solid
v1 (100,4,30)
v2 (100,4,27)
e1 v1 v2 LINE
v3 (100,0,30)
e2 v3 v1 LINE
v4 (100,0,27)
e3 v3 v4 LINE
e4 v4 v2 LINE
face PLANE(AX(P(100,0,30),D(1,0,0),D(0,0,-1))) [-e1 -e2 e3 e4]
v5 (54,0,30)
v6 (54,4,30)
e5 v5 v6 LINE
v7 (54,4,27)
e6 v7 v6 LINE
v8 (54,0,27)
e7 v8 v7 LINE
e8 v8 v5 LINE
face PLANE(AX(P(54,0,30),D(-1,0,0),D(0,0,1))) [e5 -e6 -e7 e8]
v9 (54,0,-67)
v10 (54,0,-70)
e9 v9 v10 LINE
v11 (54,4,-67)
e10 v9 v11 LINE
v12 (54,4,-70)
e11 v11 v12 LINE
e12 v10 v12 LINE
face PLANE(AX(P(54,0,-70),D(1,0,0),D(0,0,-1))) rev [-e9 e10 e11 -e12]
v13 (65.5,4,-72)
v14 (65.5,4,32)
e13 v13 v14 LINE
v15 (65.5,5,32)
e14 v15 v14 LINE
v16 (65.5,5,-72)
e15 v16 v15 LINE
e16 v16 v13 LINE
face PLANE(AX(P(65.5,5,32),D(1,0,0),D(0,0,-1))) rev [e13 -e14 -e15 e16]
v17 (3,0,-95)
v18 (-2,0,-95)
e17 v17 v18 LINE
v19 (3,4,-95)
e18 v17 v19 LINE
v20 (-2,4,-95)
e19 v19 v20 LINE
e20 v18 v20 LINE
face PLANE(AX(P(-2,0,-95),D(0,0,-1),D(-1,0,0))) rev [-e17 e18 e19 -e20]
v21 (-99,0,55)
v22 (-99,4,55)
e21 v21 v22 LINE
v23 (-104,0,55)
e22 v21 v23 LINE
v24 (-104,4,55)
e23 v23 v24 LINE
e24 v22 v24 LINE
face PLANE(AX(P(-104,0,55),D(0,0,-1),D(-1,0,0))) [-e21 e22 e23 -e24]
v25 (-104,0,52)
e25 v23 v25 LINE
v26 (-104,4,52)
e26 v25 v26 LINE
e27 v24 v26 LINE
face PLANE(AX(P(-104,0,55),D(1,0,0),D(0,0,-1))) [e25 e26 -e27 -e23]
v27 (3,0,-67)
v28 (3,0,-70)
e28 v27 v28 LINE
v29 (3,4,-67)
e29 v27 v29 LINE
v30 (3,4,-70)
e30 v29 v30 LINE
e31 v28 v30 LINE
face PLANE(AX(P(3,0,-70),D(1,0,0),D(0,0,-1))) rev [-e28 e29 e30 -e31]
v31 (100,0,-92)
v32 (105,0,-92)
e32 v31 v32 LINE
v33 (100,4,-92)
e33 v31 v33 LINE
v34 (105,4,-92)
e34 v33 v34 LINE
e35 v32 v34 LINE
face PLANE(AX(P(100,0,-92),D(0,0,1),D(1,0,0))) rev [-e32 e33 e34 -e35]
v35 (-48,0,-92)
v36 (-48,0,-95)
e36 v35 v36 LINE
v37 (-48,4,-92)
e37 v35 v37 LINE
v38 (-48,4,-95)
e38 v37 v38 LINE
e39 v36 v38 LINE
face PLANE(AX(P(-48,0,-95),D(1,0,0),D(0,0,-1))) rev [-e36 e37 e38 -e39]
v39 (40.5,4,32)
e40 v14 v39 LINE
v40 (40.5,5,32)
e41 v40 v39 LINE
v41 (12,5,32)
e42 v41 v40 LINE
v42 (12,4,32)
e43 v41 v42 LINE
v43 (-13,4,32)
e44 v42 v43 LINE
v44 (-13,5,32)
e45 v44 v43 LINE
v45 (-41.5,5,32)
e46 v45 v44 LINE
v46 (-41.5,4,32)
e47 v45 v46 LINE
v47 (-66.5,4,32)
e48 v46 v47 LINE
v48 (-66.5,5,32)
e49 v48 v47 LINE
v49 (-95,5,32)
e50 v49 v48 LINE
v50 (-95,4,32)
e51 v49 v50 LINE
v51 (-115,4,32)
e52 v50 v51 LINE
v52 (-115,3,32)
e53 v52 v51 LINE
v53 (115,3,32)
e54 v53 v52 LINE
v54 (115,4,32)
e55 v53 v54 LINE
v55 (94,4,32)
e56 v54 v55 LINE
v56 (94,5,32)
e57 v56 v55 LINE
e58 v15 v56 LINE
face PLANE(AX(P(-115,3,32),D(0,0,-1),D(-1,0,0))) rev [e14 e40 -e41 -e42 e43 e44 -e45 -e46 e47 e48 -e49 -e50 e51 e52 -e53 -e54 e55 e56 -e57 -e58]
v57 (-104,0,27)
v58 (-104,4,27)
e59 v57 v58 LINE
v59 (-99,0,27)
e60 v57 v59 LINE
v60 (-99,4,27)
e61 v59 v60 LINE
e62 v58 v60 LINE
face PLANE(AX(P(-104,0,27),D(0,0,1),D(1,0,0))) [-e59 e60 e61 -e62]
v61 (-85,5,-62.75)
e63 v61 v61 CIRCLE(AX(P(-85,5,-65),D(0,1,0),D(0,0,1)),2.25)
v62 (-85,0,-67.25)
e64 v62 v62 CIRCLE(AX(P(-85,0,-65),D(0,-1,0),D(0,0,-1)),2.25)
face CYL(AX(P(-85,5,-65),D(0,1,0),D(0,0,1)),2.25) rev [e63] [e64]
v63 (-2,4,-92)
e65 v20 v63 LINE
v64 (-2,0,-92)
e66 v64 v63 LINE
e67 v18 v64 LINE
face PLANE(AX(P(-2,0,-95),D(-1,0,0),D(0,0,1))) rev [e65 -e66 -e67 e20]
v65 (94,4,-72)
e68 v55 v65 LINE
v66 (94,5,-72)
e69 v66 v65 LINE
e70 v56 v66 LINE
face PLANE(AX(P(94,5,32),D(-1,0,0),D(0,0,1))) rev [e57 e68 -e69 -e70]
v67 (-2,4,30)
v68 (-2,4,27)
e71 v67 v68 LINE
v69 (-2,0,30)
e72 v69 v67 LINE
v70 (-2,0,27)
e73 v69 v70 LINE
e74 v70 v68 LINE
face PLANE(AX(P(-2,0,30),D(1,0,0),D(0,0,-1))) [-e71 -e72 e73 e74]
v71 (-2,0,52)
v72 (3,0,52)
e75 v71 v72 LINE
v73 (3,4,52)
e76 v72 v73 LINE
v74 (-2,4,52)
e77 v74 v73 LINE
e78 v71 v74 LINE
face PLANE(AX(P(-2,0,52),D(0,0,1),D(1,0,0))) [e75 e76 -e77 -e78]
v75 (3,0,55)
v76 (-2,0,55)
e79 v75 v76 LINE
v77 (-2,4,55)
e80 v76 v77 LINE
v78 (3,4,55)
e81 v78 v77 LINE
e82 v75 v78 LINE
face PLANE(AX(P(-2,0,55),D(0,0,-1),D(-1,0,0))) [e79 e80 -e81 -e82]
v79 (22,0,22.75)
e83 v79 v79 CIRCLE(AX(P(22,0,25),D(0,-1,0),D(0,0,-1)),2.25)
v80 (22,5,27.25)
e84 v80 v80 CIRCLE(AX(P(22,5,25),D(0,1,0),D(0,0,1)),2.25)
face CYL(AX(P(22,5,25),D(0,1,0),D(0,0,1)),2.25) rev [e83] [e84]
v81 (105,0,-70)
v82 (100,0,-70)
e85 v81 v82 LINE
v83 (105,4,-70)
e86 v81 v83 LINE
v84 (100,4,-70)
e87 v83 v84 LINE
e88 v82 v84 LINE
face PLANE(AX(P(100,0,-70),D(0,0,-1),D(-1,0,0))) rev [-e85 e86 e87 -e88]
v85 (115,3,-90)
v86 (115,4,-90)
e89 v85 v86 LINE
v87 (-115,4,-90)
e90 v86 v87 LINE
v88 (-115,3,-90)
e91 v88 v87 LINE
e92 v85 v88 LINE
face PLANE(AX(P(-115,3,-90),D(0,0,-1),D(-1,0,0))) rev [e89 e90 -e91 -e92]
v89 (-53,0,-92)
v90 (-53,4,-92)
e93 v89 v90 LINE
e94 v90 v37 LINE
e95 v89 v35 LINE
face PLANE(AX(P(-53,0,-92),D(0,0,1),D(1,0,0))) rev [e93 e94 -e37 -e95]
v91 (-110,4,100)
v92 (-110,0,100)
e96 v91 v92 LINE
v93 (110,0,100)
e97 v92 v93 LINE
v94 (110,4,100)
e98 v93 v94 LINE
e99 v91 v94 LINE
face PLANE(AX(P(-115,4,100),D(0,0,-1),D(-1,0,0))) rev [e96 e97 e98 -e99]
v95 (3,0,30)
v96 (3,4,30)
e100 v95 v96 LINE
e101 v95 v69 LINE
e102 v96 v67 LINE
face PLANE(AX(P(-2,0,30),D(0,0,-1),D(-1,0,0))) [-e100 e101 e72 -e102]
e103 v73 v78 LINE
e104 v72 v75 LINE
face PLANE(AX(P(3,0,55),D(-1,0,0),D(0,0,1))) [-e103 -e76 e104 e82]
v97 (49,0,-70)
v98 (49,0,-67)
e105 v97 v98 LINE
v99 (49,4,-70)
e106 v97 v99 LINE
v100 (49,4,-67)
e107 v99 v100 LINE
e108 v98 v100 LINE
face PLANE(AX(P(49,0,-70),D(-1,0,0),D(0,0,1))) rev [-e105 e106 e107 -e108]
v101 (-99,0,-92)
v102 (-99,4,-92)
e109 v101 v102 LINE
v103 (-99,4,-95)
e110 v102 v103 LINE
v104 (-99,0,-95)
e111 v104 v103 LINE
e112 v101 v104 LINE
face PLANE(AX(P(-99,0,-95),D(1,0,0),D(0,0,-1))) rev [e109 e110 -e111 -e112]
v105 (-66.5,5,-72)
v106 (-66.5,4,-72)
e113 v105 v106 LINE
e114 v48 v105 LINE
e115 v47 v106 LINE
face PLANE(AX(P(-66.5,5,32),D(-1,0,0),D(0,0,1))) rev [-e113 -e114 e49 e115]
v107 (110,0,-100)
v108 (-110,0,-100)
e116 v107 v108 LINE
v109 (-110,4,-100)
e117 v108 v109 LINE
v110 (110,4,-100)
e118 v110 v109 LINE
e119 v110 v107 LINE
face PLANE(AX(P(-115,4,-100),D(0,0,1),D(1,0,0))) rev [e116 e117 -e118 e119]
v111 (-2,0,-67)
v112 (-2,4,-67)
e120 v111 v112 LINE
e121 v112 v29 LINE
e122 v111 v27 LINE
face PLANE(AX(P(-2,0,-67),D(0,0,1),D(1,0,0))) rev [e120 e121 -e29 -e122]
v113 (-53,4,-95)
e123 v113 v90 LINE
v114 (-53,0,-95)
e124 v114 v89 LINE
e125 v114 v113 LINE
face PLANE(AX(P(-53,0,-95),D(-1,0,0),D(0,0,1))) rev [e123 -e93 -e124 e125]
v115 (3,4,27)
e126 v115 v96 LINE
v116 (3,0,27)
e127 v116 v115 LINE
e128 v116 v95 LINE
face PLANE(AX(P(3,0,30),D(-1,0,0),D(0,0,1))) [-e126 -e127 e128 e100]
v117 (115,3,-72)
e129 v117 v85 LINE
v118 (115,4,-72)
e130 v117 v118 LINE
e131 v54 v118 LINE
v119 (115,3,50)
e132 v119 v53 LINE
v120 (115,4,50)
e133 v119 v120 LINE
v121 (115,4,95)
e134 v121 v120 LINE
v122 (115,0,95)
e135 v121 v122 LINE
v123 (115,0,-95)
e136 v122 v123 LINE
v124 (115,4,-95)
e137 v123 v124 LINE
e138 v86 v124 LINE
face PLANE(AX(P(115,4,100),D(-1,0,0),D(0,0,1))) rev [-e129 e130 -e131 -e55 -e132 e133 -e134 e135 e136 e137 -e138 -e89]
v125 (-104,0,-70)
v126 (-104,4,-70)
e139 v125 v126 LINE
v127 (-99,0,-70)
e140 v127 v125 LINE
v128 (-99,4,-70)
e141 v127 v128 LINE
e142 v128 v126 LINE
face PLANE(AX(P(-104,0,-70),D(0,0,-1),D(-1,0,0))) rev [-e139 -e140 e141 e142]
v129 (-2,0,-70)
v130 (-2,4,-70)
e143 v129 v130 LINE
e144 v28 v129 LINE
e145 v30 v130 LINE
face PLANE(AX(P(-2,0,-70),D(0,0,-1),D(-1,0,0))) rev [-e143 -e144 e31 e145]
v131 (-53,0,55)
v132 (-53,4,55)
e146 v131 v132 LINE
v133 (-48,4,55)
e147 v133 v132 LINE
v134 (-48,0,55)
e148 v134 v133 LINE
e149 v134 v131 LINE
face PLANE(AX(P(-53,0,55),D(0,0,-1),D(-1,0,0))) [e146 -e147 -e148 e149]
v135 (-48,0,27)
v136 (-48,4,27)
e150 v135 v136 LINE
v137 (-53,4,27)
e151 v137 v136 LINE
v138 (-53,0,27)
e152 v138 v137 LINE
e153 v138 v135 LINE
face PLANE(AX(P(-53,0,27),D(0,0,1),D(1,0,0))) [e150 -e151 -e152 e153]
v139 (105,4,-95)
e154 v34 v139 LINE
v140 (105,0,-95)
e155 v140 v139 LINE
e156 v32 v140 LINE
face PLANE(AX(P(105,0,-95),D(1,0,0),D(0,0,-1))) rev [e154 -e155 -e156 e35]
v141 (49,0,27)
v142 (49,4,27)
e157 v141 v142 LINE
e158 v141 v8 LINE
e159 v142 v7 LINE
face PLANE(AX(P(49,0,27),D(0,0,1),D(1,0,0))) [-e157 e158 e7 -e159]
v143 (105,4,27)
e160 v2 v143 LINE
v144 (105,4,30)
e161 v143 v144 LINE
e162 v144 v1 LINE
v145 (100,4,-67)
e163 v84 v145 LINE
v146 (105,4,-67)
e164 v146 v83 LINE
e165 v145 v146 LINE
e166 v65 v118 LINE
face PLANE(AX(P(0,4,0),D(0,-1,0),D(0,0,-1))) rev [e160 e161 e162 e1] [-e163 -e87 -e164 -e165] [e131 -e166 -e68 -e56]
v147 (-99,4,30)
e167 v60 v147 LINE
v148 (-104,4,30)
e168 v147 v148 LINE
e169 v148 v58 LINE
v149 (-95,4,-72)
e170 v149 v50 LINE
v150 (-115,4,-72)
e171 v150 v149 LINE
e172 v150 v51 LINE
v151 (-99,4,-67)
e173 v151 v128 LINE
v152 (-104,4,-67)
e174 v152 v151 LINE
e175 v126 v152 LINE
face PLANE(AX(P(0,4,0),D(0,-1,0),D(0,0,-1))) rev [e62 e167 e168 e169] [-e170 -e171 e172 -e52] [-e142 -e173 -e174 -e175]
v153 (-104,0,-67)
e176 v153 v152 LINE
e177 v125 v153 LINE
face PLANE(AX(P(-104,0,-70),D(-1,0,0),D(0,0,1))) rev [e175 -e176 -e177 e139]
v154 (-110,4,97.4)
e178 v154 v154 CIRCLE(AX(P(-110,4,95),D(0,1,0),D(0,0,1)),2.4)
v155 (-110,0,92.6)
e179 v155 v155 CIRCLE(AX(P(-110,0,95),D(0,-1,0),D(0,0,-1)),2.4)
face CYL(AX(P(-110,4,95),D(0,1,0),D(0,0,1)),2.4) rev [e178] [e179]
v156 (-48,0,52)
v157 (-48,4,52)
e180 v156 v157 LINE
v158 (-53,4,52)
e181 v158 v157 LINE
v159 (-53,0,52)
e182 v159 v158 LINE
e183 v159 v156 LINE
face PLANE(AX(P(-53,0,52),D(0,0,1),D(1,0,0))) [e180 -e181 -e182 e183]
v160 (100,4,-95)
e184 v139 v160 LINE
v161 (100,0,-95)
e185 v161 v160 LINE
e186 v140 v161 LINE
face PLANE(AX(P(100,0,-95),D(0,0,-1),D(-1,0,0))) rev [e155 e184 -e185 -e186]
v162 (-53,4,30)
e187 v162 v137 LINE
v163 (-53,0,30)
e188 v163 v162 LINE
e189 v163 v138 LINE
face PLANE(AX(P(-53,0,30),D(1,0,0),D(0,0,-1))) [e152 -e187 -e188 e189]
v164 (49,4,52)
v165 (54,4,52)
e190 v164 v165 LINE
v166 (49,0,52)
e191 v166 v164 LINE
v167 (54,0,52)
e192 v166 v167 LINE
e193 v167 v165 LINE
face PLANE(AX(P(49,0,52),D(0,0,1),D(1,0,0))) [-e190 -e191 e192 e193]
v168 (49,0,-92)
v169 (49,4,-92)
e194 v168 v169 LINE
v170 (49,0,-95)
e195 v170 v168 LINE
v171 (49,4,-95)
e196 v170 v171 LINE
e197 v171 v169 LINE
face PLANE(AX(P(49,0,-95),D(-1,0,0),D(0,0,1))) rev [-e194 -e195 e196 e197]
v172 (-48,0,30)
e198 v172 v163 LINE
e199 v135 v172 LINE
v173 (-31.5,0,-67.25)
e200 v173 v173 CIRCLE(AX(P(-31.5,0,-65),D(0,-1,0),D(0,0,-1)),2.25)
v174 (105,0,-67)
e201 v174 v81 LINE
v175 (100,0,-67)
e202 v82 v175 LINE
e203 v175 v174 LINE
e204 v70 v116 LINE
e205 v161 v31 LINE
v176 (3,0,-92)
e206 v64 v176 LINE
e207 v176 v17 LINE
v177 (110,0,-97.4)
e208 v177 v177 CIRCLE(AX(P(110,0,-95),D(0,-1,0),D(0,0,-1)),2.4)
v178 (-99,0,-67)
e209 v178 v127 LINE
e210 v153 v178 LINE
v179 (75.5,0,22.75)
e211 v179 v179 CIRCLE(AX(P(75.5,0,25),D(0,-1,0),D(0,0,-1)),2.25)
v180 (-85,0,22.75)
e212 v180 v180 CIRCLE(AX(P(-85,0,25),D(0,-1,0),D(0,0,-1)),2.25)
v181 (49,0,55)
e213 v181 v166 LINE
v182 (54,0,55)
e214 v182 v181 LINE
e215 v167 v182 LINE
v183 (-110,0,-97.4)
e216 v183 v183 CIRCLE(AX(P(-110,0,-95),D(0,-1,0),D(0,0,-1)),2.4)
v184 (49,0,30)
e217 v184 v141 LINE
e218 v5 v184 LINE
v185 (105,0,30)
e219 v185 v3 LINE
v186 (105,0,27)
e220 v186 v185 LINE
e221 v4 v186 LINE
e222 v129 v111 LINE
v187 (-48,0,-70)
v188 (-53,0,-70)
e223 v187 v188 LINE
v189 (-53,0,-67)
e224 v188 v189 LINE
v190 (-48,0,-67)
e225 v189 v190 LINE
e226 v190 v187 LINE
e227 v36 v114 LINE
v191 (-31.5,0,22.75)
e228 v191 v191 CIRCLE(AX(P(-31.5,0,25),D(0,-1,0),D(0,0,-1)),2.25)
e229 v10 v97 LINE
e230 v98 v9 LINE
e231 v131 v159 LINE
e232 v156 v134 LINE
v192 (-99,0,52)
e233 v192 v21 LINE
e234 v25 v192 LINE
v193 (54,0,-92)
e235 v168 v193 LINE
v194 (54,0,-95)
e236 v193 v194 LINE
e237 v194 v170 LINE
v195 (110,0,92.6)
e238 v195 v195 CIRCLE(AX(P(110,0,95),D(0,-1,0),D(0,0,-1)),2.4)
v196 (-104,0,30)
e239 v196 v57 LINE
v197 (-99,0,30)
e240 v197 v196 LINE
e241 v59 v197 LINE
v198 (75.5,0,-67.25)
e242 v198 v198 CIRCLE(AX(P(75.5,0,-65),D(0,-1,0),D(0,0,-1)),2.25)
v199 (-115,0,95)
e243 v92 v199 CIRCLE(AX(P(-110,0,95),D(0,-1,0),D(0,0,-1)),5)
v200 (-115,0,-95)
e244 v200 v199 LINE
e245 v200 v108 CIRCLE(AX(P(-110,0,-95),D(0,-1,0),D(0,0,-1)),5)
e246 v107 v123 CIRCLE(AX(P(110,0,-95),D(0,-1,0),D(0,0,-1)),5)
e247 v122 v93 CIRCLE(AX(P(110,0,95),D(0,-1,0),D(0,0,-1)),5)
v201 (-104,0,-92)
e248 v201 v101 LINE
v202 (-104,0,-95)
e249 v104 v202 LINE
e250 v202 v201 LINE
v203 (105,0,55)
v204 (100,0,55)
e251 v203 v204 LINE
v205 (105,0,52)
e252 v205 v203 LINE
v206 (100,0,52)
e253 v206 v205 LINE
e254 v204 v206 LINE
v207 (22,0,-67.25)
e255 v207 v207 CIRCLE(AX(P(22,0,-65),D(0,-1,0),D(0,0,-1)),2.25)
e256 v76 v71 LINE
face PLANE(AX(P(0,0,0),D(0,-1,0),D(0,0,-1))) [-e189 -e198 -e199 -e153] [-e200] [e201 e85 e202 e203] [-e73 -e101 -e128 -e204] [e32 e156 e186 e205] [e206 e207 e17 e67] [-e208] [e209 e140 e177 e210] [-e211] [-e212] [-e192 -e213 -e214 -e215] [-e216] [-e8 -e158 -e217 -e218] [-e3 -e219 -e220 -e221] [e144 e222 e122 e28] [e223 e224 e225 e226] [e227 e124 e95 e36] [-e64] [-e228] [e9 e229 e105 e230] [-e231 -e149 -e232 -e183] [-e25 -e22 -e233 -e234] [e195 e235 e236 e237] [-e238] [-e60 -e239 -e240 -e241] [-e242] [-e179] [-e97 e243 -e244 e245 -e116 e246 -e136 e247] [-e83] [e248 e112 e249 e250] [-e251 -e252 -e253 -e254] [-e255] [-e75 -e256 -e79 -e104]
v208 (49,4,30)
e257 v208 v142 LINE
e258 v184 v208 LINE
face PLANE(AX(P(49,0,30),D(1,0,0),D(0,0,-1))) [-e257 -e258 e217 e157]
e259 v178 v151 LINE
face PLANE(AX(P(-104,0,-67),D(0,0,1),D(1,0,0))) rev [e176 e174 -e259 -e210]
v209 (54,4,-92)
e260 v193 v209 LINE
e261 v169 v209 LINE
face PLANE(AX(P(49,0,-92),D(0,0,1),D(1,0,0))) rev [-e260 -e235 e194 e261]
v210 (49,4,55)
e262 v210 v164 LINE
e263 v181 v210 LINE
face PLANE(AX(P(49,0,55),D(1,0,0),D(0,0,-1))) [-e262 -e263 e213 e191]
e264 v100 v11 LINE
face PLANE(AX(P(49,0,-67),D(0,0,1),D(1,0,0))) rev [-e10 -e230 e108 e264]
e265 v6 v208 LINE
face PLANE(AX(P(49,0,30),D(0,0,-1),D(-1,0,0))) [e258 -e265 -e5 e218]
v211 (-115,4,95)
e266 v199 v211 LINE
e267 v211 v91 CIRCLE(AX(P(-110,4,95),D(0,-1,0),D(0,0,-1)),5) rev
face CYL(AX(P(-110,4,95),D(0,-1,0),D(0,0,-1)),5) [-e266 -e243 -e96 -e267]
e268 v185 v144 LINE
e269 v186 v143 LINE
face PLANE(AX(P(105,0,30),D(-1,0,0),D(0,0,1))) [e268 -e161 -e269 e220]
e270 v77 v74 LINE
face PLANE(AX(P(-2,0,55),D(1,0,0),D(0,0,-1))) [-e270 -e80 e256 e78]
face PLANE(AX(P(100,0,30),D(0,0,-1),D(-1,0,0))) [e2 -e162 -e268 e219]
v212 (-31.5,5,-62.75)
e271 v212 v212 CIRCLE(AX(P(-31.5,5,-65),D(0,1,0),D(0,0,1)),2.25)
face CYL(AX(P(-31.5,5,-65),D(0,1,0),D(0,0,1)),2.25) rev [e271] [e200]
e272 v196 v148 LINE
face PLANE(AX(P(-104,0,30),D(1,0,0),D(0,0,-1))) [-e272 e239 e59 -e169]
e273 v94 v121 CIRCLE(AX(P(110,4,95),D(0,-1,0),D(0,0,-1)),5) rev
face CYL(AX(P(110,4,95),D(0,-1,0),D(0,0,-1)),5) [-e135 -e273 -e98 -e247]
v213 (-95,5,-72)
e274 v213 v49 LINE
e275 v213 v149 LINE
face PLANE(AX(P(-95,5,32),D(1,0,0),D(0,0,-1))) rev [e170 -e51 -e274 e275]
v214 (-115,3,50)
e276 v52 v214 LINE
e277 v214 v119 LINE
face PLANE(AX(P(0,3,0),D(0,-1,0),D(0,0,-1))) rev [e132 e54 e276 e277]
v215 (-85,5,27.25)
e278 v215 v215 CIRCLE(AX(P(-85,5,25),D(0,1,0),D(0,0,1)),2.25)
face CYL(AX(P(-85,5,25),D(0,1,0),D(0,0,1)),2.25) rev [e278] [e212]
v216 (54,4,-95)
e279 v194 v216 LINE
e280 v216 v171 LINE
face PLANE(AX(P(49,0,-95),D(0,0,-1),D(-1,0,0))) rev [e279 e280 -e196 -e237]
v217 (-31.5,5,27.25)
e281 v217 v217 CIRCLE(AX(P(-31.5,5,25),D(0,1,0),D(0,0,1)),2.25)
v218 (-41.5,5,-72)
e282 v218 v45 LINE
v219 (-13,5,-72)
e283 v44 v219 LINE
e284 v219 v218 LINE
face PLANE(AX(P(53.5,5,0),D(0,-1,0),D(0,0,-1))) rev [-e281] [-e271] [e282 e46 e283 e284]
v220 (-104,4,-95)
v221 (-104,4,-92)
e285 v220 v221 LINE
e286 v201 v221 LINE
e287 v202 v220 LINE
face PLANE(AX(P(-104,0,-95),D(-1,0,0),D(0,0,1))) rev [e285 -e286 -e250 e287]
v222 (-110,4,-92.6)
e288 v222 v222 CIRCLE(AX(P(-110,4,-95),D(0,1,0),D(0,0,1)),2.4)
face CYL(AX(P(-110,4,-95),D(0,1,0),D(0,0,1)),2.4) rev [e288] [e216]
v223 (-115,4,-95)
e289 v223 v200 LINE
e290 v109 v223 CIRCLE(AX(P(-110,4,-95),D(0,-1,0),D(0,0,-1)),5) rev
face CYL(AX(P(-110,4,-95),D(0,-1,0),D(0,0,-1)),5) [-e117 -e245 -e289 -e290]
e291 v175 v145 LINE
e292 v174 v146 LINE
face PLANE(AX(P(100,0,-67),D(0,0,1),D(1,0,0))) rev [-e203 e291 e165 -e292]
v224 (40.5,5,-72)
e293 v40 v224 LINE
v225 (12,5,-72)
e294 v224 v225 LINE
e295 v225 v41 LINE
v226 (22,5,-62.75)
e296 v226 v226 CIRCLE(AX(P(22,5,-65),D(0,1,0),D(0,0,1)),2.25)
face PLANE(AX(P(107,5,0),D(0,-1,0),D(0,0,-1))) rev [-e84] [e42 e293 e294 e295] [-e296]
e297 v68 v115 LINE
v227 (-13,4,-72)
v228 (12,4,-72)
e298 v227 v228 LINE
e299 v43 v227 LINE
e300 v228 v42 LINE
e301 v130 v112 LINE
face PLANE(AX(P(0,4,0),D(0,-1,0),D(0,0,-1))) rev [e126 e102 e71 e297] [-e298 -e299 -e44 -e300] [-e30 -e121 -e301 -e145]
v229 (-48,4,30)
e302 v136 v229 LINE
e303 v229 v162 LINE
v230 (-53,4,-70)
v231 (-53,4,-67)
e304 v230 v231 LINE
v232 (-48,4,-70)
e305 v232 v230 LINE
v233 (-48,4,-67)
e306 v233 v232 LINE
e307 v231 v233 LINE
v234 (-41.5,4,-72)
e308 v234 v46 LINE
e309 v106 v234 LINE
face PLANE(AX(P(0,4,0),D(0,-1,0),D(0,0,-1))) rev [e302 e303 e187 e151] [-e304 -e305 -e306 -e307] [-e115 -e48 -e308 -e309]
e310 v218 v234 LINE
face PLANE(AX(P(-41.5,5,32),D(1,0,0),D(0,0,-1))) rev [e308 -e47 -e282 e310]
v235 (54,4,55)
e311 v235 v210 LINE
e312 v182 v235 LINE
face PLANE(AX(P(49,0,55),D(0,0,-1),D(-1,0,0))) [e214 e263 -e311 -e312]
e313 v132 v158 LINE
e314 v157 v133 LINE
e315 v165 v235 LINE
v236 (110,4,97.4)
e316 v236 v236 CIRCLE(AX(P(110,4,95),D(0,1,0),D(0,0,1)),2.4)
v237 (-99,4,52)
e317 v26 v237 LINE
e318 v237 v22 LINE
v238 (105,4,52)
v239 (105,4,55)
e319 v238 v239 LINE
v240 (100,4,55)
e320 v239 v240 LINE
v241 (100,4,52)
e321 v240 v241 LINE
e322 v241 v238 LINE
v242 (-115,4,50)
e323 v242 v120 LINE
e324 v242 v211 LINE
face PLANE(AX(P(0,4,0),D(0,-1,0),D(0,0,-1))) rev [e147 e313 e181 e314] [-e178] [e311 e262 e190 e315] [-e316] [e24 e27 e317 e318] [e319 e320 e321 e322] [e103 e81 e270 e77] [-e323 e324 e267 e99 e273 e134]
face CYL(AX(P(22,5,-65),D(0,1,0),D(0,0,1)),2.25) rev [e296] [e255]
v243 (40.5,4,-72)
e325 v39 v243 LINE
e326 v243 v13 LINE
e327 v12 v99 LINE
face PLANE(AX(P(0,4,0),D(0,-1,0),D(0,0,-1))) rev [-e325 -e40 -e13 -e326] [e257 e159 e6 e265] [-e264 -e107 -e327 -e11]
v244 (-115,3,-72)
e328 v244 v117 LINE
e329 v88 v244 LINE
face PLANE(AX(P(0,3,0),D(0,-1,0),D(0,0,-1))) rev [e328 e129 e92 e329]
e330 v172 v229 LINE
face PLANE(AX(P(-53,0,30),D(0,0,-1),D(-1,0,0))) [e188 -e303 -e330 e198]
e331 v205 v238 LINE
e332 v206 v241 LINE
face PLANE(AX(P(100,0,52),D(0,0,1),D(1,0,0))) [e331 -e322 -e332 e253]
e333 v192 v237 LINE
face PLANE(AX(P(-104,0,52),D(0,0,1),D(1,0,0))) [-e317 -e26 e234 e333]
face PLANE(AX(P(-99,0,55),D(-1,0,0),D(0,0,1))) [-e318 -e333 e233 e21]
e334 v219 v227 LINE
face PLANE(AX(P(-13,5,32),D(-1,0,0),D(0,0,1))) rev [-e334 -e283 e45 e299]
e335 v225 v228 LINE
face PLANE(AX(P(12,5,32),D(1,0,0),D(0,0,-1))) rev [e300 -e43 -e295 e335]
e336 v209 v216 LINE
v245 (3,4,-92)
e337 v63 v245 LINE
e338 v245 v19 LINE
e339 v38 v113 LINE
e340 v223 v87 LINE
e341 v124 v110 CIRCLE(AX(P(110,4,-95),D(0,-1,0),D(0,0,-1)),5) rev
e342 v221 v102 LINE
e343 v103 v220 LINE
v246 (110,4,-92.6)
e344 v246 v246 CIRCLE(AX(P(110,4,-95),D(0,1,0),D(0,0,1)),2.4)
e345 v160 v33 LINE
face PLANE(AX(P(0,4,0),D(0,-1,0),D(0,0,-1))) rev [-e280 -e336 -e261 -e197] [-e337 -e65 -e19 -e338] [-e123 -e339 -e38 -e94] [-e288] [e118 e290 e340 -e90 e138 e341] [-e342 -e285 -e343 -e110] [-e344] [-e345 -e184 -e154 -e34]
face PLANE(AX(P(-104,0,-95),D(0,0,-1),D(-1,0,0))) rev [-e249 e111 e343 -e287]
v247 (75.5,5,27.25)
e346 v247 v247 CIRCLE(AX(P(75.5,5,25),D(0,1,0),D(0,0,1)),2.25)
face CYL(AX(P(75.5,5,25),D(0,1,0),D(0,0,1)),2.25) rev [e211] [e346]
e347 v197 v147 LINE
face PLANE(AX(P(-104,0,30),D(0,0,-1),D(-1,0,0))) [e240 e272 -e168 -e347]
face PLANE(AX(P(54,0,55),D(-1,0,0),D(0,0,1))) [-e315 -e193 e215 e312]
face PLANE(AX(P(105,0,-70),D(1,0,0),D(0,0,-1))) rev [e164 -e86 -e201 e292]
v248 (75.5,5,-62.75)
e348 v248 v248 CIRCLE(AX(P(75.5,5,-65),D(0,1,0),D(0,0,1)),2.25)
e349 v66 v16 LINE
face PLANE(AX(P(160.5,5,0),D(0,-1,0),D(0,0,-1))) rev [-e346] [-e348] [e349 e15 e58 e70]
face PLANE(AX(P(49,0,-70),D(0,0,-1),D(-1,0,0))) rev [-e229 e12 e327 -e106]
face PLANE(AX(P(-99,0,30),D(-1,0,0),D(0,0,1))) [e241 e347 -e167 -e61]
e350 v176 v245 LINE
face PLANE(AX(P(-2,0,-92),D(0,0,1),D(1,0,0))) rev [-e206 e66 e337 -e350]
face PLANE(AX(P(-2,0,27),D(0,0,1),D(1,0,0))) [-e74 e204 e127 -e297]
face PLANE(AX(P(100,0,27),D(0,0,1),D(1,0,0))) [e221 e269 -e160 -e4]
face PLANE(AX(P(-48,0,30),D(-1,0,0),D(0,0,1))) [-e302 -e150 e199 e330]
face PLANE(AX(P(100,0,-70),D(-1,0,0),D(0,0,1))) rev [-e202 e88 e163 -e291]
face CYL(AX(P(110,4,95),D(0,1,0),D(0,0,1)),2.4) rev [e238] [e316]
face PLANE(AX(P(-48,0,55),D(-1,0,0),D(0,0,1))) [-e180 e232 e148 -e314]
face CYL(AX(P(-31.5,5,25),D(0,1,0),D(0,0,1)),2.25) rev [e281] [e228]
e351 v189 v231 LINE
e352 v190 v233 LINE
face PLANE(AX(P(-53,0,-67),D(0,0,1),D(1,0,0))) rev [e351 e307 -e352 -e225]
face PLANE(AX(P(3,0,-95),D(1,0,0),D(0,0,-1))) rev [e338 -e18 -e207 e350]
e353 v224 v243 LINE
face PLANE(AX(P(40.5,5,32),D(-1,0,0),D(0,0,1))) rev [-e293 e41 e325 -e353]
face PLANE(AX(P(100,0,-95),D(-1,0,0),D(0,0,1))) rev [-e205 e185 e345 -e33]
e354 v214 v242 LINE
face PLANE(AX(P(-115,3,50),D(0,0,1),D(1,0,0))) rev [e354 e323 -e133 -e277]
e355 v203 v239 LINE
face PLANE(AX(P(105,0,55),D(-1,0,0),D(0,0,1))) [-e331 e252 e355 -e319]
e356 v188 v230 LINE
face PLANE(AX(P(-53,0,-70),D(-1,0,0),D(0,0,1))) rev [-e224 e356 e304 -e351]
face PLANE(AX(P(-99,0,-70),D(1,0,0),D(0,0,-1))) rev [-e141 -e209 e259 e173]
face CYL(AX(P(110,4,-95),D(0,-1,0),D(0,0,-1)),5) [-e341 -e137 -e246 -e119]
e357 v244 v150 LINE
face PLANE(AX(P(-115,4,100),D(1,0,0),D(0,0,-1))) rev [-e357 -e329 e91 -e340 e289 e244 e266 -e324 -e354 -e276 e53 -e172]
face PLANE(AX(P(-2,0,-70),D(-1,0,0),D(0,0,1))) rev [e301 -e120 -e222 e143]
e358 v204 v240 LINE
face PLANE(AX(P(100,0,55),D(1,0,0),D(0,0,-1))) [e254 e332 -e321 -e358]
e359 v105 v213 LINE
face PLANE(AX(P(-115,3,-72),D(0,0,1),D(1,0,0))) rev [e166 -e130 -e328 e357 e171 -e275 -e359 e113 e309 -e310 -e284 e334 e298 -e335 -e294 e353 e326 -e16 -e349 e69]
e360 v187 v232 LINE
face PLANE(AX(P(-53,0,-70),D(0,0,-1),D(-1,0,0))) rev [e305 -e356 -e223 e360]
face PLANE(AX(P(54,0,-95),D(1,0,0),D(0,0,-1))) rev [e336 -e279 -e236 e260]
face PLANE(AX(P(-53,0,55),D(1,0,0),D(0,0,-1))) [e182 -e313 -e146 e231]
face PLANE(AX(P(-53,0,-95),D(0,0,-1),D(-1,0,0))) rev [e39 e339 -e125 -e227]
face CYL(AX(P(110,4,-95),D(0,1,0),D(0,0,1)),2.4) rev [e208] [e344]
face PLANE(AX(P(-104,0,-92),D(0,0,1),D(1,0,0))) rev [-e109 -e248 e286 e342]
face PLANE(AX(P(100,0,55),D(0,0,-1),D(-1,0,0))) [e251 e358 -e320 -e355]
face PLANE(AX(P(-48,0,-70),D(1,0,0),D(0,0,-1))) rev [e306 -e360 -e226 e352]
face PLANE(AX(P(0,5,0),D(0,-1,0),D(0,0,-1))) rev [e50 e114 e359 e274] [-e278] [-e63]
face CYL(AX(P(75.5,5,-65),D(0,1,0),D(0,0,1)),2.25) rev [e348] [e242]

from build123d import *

# Parameters (mm, degrees)
BODY_SKETCH_W                          = 230
BODY_SKETCH_H                          = 200
BODY_DEPTH                             = 4
MOUNTING_HOLES_OUTLINE_R               = 2.4
MOUNTING_HOLES_DEPTH                   = 4
SKETCH4_W                              = 230
SKETCH4_H                              = 18
CABLE_CUTOUTS_DEPTH                    = 1
SKETCH6_W                              = 28.5
SKETCH6_H                              = 104
DRIVER_EXTRUSION_DEPTH                 = 1
DRIVER_MOUNTING_HOLES_OUTLINE_R        = 2.25
DRIVER_MOUNTING_HOLES_DEPTH            = 5
DRIVER_PATTERN_COUNT                   = 4
DRIVER_PATTERN_PITCH                   = 53.5
SKETCH9_W                              = 5
SKETCH9_H                              = 3
CABLE_FIXIATOR_CUTOUT_DEPTH            = 153.449991801
CABLE_FIXIATOR_PATTERN_COUNT           = 5
CABLE_FIXIATOR_PATTERN_PITCH           = 51
CABLE_FIXIATOR_PATTERN_COPY_1_SKETCH_W = 5
CABLE_FIXIATOR_PATTERN_COPY_1_SKETCH_H = 3
CABLE_FIXIATOR_PATTERN_COPY_1_DEPTH    = 153.449991801
CABLE_FIXIATOR_PATTERN_COPY_2_SKETCH_W = 5
CABLE_FIXIATOR_PATTERN_COPY_2_SKETCH_H = 3
CABLE_FIXIATOR_PATTERN_COPY_2_DEPTH    = 153.449991801
CABLE_FIXIATOR_PATTERN_COPY_3_SKETCH_W = 5
CABLE_FIXIATOR_PATTERN_COPY_3_SKETCH_H = 3
CABLE_FIXIATOR_PATTERN_COPY_3_DEPTH    = 153.449991801
CABLE_FIXIATOR_PATTERN_COPY_4_SKETCH_W = 5
CABLE_FIXIATOR_PATTERN_COPY_4_SKETCH_H = 3
CABLE_FIXIATOR_PATTERN_COPY_4_DEPTH    = 153.449991801
EDGE_FILLETS_R                         = 5


# Read off the part's stored shape, not the designer's step: mounting_holes, driver_mounting_holes
with BuildPart() as part:
    # body_sketch → body (new body)
    with BuildSketch(Plane(origin=(0, 0, 0), x_dir=(1, 0, 0), z_dir=(0, 1, 0))):
        Rectangle(BODY_SKETCH_W, BODY_SKETCH_H)
    extrude(amount=BODY_DEPTH)

    # mounting_holes outline → mounting_holes (cut)
    with BuildSketch(Plane(origin=(0, 0, 0), x_dir=(1, 0, 0), z_dir=(0, 1, 0))):
        with Locations((110, -95)):
            Circle(MOUNTING_HOLES_OUTLINE_R)
        with Locations((-110, 95)):
            Circle(MOUNTING_HOLES_OUTLINE_R)
        with Locations((-110, -95)):
            Circle(MOUNTING_HOLES_OUTLINE_R)
        with Locations((110, 95)):
            Circle(MOUNTING_HOLES_OUTLINE_R)
    extrude(amount=MOUNTING_HOLES_DEPTH, mode=Mode.SUBTRACT)

    # Sketch4 → cable_cutouts (cut)
    with BuildSketch(Plane(origin=(0, 4, 0), x_dir=(1, 0, 0), z_dir=(0, 1, 0))):
        with Locations((0, 81)):
            Rectangle(SKETCH4_W, SKETCH4_H)
        with Locations((0, -41)):
            Rectangle(SKETCH4_W, SKETCH4_H)
    extrude(amount=-CABLE_CUTOUTS_DEPTH, mode=Mode.SUBTRACT)

    # Sketch6 → driver_extrusion (add)
    with BuildSketch(Plane(origin=(0, 4, 0), x_dir=(1, 0, 0), z_dir=(0, 1, 0))):
        with Locations((-80.75, 20)):
            Rectangle(SKETCH6_W, SKETCH6_H)
    driver_extrusion = extrude(amount=DRIVER_EXTRUSION_DEPTH)

    # driver_mounting_holes outline → driver_mounting_holes (cut)
    with BuildSketch(Plane(origin=(0, 0, 0), x_dir=(1, 0, 0), z_dir=(0, 1, 0))):
        with Locations((-85, -25)):
            Circle(DRIVER_MOUNTING_HOLES_OUTLINE_R)
        with Locations((-85, 65)):
            Circle(DRIVER_MOUNTING_HOLES_OUTLINE_R)
    driver_mounting_holes = extrude(amount=DRIVER_MOUNTING_HOLES_DEPTH, mode=Mode.SUBTRACT)

    # driver_pattern: driver_extrusion, driver_mounting_holes ×4
    with Locations(*[(i * DRIVER_PATTERN_PITCH, 0, 0) for i in range(1, DRIVER_PATTERN_COUNT)]):
        add(driver_extrusion)
        add(driver_mounting_holes, mode=Mode.SUBTRACT)

    # Sketch9 → cable_fixiator_cutout (cut, through all)
    with BuildSketch(Plane(origin=(0, 4, 0), x_dir=(1, 0, 0), z_dir=(0, 1, 0))):
        with Locations((-101.5, 93.5)):
            Rectangle(SKETCH9_W, SKETCH9_H)
        with Locations((-101.5, 68.5)):
            Rectangle(SKETCH9_W, SKETCH9_H)
    cable_fixiator_cutout = extrude(amount=-CABLE_FIXIATOR_CUTOUT_DEPTH, mode=Mode.SUBTRACT)

    # cable_fixiator_mirror: cable_fixiator_cutout across plane
    add(cable_fixiator_cutout.mirror(Plane.XY.offset(-20)), mode=Mode.SUBTRACT)

    # cable_fixiator_pattern: cable_fixiator_cutout ×5
    with Locations(*[(i * CABLE_FIXIATOR_PATTERN_PITCH, 0, 0) for i in range(1, CABLE_FIXIATOR_PATTERN_COUNT)]):
        add(cable_fixiator_cutout, mode=Mode.SUBTRACT)

    # cable_fixiator_pattern copy 1 sketch → cable_fixiator_pattern copy 1 (cut, through all)
    with BuildSketch(Plane(origin=(51, 4, -40), x_dir=(1, 0, 0), z_dir=(0, 1, 0))):
        with Locations((-101.5, -93.5)):
            Rectangle(CABLE_FIXIATOR_PATTERN_COPY_1_SKETCH_W, CABLE_FIXIATOR_PATTERN_COPY_1_SKETCH_H)
        with Locations((-101.5, -68.5)):
            Rectangle(CABLE_FIXIATOR_PATTERN_COPY_1_SKETCH_W, CABLE_FIXIATOR_PATTERN_COPY_1_SKETCH_H)
    extrude(amount=-CABLE_FIXIATOR_PATTERN_COPY_1_DEPTH, mode=Mode.SUBTRACT)

    # cable_fixiator_pattern copy 2 sketch → cable_fixiator_pattern copy 2 (cut, through all)
    with BuildSketch(Plane(origin=(102, 4, -40), x_dir=(1, 0, 0), z_dir=(0, 1, 0))):
        with Locations((-101.5, -93.5)):
            Rectangle(CABLE_FIXIATOR_PATTERN_COPY_2_SKETCH_W, CABLE_FIXIATOR_PATTERN_COPY_2_SKETCH_H)
        with Locations((-101.5, -68.5)):
            Rectangle(CABLE_FIXIATOR_PATTERN_COPY_2_SKETCH_W, CABLE_FIXIATOR_PATTERN_COPY_2_SKETCH_H)
    extrude(amount=-CABLE_FIXIATOR_PATTERN_COPY_2_DEPTH, mode=Mode.SUBTRACT)

    # cable_fixiator_pattern copy 3 sketch → cable_fixiator_pattern copy 3 (cut, through all)
    with BuildSketch(Plane(origin=(153, 4, -40), x_dir=(1, 0, 0), z_dir=(0, 1, 0))):
        with Locations((-101.5, -93.5)):
            Rectangle(CABLE_FIXIATOR_PATTERN_COPY_3_SKETCH_W, CABLE_FIXIATOR_PATTERN_COPY_3_SKETCH_H)
        with Locations((-101.5, -68.5)):
            Rectangle(CABLE_FIXIATOR_PATTERN_COPY_3_SKETCH_W, CABLE_FIXIATOR_PATTERN_COPY_3_SKETCH_H)
    extrude(amount=-CABLE_FIXIATOR_PATTERN_COPY_3_DEPTH, mode=Mode.SUBTRACT)

    # cable_fixiator_pattern copy 4 sketch → cable_fixiator_pattern copy 4 (cut, through all)
    with BuildSketch(Plane(origin=(204, 4, -40), x_dir=(1, 0, 0), z_dir=(0, 1, 0))):
        with Locations((-101.5, -93.5)):
            Rectangle(CABLE_FIXIATOR_PATTERN_COPY_4_SKETCH_W, CABLE_FIXIATOR_PATTERN_COPY_4_SKETCH_H)
        with Locations((-101.5, -68.5)):
            Rectangle(CABLE_FIXIATOR_PATTERN_COPY_4_SKETCH_W, CABLE_FIXIATOR_PATTERN_COPY_4_SKETCH_H)
    extrude(amount=-CABLE_FIXIATOR_PATTERN_COPY_4_DEPTH, mode=Mode.SUBTRACT)

    # edge_fillets
    edge_fillets_edges = [part.edges().sort_by_distance(p)[0] for p in [
        (115, 2, 100),
        (-115, 2, 100),
        (-115, 2, -100),
        (115, 2, -100),
    ]]
    fillet(edge_fillets_edges, radius=EDGE_FILLETS_R)


solid = part.part
